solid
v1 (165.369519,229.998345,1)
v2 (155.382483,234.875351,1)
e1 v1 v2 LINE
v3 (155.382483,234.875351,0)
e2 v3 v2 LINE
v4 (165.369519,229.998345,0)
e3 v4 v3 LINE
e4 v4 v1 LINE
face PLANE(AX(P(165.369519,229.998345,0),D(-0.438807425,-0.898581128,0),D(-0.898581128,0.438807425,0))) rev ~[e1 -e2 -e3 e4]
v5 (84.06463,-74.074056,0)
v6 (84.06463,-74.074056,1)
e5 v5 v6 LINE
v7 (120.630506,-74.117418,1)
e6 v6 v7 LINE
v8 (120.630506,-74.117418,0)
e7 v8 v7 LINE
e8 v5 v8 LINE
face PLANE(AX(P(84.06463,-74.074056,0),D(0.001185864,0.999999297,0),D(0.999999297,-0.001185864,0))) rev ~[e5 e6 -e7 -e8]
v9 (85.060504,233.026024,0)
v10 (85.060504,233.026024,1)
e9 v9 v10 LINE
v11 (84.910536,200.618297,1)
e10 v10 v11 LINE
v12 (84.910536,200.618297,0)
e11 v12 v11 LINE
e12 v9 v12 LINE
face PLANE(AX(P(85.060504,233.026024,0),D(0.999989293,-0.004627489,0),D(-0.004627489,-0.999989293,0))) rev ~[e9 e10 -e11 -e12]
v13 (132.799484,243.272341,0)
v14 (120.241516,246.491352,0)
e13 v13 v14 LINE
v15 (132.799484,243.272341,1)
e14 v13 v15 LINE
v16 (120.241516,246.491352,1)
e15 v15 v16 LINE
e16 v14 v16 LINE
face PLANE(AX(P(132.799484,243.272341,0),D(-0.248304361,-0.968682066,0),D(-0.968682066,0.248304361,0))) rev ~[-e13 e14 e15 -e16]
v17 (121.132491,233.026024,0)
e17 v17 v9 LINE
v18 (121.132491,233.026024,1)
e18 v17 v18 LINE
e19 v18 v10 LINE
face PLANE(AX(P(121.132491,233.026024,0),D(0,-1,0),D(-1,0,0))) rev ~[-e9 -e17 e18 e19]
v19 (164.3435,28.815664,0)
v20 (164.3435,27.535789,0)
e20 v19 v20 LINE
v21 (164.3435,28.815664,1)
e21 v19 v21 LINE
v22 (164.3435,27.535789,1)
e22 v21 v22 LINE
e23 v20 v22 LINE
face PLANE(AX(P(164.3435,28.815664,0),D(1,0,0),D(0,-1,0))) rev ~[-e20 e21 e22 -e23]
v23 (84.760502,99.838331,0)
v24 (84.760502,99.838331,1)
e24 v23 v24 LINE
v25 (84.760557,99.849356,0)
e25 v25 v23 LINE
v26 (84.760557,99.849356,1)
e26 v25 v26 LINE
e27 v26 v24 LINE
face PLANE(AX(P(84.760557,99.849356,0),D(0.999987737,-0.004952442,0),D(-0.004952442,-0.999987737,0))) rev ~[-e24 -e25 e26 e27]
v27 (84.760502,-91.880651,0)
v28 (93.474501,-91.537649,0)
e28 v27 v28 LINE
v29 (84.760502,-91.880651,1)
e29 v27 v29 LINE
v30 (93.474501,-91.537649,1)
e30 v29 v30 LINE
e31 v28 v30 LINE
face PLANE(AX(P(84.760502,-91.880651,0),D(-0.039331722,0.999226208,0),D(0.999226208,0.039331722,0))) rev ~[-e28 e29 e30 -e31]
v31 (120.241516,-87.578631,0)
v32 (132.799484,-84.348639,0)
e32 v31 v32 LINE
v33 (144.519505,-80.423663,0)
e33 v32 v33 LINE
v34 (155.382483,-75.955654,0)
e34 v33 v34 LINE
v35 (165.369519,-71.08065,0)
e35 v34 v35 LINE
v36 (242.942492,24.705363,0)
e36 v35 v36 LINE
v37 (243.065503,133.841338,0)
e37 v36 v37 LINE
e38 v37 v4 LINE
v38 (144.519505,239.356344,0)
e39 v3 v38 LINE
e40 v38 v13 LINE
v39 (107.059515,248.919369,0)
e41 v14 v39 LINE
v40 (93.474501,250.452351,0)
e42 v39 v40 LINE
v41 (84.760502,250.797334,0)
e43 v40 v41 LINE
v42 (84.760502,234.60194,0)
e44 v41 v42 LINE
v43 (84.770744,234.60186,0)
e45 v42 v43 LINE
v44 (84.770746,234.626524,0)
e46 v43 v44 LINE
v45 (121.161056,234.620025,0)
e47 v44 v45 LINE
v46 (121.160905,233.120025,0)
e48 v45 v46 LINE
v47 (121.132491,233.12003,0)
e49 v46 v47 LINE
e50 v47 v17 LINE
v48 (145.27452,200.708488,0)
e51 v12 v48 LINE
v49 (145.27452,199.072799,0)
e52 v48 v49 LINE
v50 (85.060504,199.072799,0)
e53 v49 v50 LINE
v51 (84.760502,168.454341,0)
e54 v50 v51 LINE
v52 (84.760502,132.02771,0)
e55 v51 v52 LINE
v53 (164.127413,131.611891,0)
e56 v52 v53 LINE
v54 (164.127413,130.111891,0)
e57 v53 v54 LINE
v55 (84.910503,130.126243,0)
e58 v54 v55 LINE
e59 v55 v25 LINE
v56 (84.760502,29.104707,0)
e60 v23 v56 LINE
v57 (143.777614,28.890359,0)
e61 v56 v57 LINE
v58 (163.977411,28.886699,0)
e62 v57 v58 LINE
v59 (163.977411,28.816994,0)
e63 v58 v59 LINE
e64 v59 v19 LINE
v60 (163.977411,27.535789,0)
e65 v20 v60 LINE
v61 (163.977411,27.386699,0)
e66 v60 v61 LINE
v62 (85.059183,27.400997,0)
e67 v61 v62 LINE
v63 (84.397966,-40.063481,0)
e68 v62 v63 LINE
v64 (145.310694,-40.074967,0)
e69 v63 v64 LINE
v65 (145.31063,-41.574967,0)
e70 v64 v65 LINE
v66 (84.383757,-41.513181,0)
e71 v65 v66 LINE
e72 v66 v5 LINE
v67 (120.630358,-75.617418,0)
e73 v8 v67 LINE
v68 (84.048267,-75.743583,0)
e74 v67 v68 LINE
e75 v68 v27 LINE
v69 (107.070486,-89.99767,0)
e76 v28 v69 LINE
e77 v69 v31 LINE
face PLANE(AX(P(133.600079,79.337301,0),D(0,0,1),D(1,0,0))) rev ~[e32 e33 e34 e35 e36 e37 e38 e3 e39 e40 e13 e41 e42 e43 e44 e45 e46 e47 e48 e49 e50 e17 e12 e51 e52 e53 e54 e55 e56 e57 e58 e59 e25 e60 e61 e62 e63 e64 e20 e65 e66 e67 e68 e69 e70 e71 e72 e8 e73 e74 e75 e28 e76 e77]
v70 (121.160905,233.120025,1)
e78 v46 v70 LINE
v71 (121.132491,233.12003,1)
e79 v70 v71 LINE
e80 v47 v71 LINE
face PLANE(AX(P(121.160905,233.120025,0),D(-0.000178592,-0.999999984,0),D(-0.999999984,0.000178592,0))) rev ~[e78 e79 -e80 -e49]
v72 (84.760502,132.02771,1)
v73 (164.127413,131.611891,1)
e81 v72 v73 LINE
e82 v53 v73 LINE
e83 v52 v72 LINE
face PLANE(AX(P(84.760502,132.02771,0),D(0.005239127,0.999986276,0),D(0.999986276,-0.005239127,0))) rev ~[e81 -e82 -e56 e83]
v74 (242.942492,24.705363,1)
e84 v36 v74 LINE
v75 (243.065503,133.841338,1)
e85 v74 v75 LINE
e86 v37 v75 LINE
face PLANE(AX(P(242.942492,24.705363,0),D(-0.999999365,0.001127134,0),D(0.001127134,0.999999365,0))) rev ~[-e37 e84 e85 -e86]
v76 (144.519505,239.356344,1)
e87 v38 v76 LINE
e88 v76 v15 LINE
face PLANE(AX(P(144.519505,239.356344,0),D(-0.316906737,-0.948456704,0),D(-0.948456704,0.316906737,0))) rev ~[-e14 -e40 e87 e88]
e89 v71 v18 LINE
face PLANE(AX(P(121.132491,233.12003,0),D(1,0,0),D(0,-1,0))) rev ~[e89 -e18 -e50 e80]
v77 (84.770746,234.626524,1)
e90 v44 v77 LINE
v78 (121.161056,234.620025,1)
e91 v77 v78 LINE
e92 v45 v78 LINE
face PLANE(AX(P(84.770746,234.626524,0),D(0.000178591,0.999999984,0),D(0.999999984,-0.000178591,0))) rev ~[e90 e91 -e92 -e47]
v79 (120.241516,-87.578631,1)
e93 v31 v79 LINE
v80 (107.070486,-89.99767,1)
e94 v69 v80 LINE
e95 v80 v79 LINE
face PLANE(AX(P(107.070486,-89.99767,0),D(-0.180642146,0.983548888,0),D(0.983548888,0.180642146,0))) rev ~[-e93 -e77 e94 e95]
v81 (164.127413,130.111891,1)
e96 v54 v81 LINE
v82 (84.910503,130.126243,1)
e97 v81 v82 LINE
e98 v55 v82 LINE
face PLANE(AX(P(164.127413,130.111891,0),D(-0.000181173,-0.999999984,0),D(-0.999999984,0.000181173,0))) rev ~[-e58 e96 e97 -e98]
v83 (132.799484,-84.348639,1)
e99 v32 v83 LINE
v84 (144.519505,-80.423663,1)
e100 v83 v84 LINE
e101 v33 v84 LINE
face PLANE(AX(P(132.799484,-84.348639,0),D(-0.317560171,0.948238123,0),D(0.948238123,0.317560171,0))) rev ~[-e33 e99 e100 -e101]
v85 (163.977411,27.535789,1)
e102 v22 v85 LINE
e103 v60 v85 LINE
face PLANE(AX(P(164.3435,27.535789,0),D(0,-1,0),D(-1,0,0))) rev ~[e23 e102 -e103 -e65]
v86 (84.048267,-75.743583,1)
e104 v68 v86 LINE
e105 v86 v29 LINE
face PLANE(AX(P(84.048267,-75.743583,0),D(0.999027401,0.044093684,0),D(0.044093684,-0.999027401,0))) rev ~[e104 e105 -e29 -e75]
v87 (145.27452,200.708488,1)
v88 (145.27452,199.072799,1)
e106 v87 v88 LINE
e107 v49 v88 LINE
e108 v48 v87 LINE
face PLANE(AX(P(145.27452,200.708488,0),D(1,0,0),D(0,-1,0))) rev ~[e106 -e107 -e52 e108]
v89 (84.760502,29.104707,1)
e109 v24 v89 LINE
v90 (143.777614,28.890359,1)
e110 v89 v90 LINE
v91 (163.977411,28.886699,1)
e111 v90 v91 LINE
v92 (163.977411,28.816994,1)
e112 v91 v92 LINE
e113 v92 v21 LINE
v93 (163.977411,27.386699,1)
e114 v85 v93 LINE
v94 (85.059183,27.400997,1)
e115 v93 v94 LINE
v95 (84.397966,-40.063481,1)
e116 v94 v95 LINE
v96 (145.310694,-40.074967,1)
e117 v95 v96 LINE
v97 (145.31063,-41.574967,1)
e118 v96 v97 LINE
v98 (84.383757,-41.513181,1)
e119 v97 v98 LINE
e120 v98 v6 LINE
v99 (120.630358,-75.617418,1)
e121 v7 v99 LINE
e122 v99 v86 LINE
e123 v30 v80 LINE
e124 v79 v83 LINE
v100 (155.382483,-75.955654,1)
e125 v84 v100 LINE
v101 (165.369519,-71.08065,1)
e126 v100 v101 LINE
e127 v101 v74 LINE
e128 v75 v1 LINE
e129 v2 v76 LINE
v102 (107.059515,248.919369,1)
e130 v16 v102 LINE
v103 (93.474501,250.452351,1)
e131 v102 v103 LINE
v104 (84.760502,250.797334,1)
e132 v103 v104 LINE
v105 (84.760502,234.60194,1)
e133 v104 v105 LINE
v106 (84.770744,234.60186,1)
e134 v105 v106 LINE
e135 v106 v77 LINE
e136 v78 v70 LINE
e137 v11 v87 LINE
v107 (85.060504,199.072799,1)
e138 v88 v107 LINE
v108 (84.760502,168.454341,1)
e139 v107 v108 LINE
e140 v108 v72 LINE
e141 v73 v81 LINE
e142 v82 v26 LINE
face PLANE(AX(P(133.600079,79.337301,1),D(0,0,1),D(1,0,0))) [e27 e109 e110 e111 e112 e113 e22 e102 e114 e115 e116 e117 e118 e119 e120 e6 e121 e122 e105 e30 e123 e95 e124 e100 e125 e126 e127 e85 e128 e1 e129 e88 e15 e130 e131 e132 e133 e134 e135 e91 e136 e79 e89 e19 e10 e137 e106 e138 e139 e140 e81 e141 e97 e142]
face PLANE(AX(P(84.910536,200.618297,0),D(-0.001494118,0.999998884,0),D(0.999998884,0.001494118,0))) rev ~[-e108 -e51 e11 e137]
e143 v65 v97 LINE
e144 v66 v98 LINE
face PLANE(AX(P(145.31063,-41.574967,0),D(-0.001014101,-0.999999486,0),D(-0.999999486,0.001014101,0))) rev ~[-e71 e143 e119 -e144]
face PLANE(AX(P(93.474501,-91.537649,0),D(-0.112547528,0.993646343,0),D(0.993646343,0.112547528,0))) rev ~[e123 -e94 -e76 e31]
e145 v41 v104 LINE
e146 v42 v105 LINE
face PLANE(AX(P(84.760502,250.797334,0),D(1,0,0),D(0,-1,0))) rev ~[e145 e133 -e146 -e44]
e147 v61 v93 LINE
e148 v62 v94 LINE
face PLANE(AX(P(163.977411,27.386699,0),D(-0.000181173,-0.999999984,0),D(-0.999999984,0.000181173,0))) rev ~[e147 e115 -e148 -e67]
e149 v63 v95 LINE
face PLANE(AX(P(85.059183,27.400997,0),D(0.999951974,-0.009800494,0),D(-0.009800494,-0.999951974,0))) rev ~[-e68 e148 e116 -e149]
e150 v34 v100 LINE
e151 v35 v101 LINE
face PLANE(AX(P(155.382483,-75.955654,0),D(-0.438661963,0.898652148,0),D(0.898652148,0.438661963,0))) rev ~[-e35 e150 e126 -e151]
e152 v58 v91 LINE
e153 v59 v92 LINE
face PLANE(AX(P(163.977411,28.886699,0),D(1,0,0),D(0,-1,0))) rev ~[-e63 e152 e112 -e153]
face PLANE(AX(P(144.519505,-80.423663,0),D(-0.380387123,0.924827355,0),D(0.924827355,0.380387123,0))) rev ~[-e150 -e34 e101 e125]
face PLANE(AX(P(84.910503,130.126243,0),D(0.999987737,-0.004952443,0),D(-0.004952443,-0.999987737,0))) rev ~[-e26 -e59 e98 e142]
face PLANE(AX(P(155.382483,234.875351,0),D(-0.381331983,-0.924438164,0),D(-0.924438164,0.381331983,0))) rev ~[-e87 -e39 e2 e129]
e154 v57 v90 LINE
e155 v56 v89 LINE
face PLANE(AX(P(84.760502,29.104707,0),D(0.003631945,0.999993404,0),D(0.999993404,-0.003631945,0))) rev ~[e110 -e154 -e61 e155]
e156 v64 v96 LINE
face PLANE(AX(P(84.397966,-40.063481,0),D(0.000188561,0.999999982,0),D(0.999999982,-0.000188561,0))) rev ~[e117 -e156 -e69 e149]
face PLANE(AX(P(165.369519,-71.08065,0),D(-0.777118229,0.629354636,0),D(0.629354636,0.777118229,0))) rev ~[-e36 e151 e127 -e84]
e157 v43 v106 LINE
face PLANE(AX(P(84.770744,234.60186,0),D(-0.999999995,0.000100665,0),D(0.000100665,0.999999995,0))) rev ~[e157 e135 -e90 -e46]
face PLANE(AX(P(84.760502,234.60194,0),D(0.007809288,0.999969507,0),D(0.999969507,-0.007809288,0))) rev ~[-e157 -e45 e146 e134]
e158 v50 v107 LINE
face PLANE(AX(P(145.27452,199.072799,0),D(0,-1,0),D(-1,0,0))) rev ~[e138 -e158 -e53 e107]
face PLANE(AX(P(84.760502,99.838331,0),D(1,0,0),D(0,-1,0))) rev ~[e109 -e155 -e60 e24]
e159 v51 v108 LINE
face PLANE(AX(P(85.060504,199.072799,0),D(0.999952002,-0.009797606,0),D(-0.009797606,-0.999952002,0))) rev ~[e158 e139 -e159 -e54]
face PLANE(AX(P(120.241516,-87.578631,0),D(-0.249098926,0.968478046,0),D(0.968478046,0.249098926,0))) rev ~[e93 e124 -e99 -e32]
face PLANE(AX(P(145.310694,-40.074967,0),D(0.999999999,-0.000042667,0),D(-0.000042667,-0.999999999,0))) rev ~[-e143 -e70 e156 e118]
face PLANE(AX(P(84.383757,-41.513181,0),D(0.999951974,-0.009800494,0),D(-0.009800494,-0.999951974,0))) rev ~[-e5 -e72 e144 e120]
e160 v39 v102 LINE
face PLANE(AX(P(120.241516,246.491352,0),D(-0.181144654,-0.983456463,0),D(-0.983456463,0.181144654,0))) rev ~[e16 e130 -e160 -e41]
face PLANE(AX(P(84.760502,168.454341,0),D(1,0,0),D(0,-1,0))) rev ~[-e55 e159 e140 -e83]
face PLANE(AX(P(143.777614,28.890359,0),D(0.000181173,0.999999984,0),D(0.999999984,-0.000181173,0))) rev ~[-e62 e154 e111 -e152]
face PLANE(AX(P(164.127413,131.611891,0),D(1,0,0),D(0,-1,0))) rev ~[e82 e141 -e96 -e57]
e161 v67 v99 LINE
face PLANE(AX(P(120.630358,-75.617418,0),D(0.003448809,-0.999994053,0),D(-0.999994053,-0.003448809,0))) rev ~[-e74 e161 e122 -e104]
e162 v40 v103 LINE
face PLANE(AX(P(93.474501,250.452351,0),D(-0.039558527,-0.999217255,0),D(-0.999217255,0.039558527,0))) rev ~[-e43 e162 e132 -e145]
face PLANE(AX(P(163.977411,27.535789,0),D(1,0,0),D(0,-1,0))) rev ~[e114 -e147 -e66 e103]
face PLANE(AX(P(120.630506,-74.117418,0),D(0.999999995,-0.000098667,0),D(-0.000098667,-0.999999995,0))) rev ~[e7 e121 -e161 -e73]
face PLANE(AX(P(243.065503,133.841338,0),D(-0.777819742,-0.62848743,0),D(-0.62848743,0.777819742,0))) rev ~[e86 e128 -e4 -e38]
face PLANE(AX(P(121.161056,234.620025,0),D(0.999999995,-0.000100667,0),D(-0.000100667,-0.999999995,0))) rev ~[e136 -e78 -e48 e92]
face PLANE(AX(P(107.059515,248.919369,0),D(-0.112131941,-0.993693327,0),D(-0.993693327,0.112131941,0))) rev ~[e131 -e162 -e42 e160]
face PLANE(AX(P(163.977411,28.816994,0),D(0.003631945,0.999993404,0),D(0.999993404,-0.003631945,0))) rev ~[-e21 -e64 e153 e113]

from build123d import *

# Parameters (mm, degrees)
F1_DEPTH = 1


# Not quite as in the source:
# - ends of sketch curves that miss each other by under 0.0002 mm in the source are joined


with BuildPart() as f1:
    # F0 (on Top) → F1 (new body)
    with BuildSketch(Plane.XY):
        Polygon((84.760502, 99.838331), (84.760502, 65.532372), (84.760502, 29.104707), (143.7776135408, 28.8903586668), (163.977411, 28.886699), (163.977411, 28.816993624), (164.3435, 28.815664), (164.3435, 27.535789), (163.977411, 27.535789), (163.977411, 27.386699), (85.0591829073, 27.400996887), (84.3979659422, -40.0634812645), (145.310694, -40.074967), (145.31063, -41.574967), (84.3837574867, -41.5131809608), (84.0646295035, -74.0740558181), (120.630506, -74.117418), (120.630358, -75.617418), (84.0482665226, -75.7435834112), (84.760502, -91.880651), (93.474501, -91.537649), (107.070486, -89.99767), (120.241516, -87.578631), (132.799484, -84.348639), (144.519505, -80.423663), (155.382483, -75.955654), (165.369519, -71.08065), (242.942492, 24.705363), (243.065503, 133.841338), (165.369519, 229.998345), (155.382483, 234.875351), (144.519505, 239.356344), (132.799484, 243.272341), (120.241516, 246.491352), (107.059515, 248.919369), (93.474501, 250.452351), (84.760502, 250.797334), (84.760502, 234.60194), (84.7707435172, 234.6018600186), (84.770746, 234.626524), (121.161056, 234.620025), (121.160905, 233.120025), (121.132491, 233.1200300745), (121.132491, 233.026024), (85.060504, 233.026024), (84.910536, 200.618297), (145.27452, 200.708488), (145.27452, 199.072799), (85.060504, 199.072799), (84.760502, 168.454341), (84.760502, 132.02771), (164.127413, 131.611891), (164.127413, 130.111891), (84.910503, 130.126243), (84.7605566, 99.8493557296), align=None)
    extrude(amount=F1_DEPTH)


solid = f1.part
